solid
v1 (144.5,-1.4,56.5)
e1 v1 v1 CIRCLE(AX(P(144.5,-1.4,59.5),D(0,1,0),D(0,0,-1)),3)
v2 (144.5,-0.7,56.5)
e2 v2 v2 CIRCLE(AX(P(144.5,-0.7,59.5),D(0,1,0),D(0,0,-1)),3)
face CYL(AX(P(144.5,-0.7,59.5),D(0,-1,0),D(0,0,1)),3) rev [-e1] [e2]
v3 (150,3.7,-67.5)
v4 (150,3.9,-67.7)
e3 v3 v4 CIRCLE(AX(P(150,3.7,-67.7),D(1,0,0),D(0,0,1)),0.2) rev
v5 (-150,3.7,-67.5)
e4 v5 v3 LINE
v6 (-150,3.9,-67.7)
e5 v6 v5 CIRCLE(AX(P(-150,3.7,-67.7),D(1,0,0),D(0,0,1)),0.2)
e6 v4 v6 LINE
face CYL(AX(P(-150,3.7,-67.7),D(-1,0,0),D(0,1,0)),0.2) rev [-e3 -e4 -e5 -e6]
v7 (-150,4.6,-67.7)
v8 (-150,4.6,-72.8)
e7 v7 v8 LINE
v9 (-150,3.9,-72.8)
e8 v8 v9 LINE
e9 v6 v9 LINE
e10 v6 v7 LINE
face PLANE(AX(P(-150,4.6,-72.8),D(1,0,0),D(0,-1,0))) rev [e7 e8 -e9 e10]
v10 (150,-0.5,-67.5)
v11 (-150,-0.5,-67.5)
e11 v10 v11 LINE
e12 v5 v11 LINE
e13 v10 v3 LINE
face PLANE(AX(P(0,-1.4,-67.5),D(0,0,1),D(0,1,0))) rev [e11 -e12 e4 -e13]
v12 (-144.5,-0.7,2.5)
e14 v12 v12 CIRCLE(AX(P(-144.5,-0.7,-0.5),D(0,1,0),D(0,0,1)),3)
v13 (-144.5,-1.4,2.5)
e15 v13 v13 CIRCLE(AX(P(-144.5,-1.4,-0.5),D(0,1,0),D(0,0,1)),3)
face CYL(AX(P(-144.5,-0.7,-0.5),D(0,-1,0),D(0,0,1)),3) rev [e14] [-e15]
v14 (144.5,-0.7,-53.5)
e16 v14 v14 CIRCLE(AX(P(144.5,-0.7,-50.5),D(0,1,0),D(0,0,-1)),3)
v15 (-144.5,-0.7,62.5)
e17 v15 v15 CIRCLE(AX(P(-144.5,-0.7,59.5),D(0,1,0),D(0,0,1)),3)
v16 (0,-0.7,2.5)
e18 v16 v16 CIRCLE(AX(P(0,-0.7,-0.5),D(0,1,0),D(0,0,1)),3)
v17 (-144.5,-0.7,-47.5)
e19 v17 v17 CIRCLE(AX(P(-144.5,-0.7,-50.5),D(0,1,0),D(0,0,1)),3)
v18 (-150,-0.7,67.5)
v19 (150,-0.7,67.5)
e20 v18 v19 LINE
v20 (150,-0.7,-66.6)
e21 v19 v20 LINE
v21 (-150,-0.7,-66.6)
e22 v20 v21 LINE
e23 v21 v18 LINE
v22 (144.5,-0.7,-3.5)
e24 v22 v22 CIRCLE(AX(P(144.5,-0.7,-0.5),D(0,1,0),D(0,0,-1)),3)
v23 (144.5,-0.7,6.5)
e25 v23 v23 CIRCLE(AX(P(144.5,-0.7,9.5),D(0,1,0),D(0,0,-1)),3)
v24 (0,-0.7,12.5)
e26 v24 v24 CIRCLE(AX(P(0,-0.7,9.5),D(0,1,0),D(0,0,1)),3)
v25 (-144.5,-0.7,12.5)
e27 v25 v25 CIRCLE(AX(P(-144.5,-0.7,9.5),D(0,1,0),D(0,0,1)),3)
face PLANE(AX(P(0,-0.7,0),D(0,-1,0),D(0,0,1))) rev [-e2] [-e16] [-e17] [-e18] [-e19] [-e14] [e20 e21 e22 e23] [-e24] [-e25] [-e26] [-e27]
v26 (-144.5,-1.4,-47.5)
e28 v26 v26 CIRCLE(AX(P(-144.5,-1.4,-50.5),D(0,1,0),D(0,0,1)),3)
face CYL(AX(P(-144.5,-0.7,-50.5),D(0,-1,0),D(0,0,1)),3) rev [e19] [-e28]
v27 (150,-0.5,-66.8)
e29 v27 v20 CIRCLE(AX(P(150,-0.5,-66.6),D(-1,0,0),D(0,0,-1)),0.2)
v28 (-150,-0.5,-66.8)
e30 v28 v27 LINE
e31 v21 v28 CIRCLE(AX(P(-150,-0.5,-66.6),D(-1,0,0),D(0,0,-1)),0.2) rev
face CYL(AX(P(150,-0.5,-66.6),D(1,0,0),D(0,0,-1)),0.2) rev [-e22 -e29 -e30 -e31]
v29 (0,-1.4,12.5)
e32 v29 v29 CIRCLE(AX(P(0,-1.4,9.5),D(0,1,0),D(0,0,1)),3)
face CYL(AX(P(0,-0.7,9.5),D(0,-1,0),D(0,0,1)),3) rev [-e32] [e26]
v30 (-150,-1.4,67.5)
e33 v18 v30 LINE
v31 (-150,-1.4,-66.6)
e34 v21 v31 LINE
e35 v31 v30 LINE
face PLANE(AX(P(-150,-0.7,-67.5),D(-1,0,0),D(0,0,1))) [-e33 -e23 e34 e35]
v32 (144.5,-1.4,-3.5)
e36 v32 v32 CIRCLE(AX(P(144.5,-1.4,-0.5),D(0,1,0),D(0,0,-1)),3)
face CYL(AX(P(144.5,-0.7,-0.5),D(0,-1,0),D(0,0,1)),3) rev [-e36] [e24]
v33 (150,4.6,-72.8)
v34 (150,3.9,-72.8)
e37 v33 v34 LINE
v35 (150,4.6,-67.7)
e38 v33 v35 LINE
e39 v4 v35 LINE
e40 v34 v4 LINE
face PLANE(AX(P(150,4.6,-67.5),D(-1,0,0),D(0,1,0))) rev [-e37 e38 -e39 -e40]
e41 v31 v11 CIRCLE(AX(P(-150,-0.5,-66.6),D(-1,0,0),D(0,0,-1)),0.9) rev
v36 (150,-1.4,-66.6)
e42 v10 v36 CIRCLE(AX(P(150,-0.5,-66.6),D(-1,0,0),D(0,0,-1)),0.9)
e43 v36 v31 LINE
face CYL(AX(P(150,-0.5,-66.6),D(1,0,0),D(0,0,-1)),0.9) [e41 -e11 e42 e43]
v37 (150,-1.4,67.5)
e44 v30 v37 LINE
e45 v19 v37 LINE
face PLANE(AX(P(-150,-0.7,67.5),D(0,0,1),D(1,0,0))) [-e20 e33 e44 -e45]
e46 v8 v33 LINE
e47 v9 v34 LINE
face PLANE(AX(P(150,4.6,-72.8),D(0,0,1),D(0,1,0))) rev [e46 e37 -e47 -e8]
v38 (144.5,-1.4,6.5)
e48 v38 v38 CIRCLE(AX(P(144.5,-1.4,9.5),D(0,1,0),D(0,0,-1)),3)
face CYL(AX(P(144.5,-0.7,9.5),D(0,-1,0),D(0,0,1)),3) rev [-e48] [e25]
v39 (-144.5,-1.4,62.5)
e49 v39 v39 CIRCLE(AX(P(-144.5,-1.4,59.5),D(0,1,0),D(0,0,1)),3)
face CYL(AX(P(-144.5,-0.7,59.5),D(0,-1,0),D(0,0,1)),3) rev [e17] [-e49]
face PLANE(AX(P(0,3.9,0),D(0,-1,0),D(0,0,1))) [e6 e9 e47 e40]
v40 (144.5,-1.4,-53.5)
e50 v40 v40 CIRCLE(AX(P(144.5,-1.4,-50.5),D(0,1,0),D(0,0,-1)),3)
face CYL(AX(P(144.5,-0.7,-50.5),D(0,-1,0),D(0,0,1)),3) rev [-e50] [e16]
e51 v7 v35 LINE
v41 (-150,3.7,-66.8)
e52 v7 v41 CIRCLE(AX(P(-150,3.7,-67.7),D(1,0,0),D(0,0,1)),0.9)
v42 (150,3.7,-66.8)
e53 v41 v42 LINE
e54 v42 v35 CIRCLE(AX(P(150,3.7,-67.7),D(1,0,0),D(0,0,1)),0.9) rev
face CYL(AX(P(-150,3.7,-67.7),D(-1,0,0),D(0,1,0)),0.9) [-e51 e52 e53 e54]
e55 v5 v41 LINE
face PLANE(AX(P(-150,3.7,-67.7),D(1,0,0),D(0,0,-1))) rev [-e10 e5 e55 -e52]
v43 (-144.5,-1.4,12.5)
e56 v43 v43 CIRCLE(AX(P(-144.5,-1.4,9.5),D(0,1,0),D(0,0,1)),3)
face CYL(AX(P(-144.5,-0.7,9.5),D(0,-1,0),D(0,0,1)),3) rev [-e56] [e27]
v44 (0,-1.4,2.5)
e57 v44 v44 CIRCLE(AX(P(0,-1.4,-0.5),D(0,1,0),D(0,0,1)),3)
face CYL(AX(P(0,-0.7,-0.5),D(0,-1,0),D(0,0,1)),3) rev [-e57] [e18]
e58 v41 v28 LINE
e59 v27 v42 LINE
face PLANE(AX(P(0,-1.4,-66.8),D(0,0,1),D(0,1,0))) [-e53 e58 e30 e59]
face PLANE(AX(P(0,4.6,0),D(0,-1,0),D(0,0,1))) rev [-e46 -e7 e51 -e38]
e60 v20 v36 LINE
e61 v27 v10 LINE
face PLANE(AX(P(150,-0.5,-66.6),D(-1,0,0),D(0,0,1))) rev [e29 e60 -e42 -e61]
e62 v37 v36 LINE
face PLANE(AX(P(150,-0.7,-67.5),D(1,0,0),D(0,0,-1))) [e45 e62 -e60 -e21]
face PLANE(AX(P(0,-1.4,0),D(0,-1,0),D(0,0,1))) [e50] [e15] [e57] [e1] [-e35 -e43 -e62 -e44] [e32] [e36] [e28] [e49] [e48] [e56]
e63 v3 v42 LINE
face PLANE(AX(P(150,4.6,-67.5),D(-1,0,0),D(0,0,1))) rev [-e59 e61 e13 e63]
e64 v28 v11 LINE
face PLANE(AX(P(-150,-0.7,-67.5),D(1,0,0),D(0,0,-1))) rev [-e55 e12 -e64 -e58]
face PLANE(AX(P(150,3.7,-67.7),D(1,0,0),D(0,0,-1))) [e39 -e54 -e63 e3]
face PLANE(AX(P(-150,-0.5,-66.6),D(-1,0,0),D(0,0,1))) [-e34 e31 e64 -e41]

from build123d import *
from build123d.topology import SkipClean

# Parameters (mm, degrees)
SKETCH_1_W                       = 300
SKETCH_1_H                       = 135
SKETCH_1_R                       = 3
SM_BASE_FLANGE_1_DEPTH           = 0.7
SM_EDGE_FLANGE_1_STRIP_W         = 3.2
SM_EDGE_FLANGE_1_STRIP_H         = 0.7
SM_EDGE_FLANGE_1_STRIP_CUT_DEPTH = 300
SM_EDGE_FLANGE_1_DEPTH           = 300
SM_EDGE_FLANGE_2_STRIP_W         = 3.2
SM_EDGE_FLANGE_2_STRIP_H         = 0.7
SM_EDGE_FLANGE_2_STRIP_CUT_DEPTH = 300
SM_EDGE_FLANGE_2_DEPTH           = 300
MOVE_START                       = -0.5
MOVE_BODY_1_OUTLINE_W            = 300
MOVE_BODY_1_OUTLINE_H            = 134.3
MOVE_BODY_1_OUTLINE_R            = 3
MOVE_BODY_1_DEPTH                = 0.5
MOVE_START_2                     = -6
MOVE_BODY_1_2_OUTLINE_W          = 300
MOVE_BODY_1_2_OUTLINE_H          = 6
MOVE_BODY_1_2_DEPTH              = 4.6
MOVE_START_3                     = -1.343604
MOVE_BODY_1_3_OUTLINE_W          = 300
MOVE_BODY_1_3_OUTLINE_H          = 134.3
MOVE_BODY_1_3_OUTLINE_R          = 3
MOVE_BODY_1_3_DEPTH              = 0.643604
MOVE_BODY_1_4_OUTLINE_W          = 300
MOVE_BODY_1_4_OUTLINE_H          = 0.7
MOVE_BODY_1_4_DEPTH              = 4.2
MOVE_START_4                     = -1.4
MOVE_BODY_1_5_OUTLINE_W          = 300
MOVE_BODY_1_5_OUTLINE_H          = 134.3
MOVE_BODY_1_5_OUTLINE_R          = 3
MOVE_BODY_1_5_DEPTH              = 0.056396
MOVE_START_5                     = 3.7
MOVE_BODY_1_6_OUTLINE_W          = 300
MOVE_BODY_1_6_OUTLINE_H          = 6
MOVE_BODY_1_6_DEPTH              = 0.9
MOVE_START_6                     = -0.7
MOVE_BODY_1_7_OUTLINE_W          = 300
MOVE_BODY_1_7_OUTLINE_H          = 0.7
MOVE_BODY_1_7_DEPTH              = 0.2
MOVE_START_7                     = -151
MOVE_BODY_1_8_DEPTH              = 301


with BuildPart() as part:
    # 基体-法兰1: sheet metal written as solids
    # 草图1 → 基体-法兰1 (new body)
    with BuildSketch(Plane(origin=(0, 0, 0), x_dir=(1, 0, 0), z_dir=(0, 1, 0))):
        Rectangle(SKETCH_1_W, SKETCH_1_H)
        with Locations(Location((-144.5, -59.5, 0), (0, 0, 270))):
            Circle(SKETCH_1_R, mode=Mode.SUBTRACT)
        with Locations(Location((-144.5, -9.5, 0), (0, 0, 270))):
            Circle(SKETCH_1_R, mode=Mode.SUBTRACT)
        with Locations(Location((-144.5, 0.5, 0), (0, 0, 270))):
            Circle(SKETCH_1_R, mode=Mode.SUBTRACT)
        with Locations(Location((-144.5, 50.5, 0), (0, 0, 270))):
            Circle(SKETCH_1_R, mode=Mode.SUBTRACT)
        with Locations(Location((0, -9.5, 0), (0, 0, 270))):
            Circle(SKETCH_1_R, mode=Mode.SUBTRACT)
        with Locations(Location((0, 0.5, 0), (0, 0, 270))):
            Circle(SKETCH_1_R, mode=Mode.SUBTRACT)
        with Locations(Location((144.5, -59.5, 0), (0, 0, 90))):
            Circle(SKETCH_1_R, mode=Mode.SUBTRACT)
        with Locations(Location((144.5, -9.5, 0), (0, 0, 90))):
            Circle(SKETCH_1_R, mode=Mode.SUBTRACT)
        with Locations(Location((144.5, 0.5, 0), (0, 0, 90))):
            Circle(SKETCH_1_R, mode=Mode.SUBTRACT)
        with Locations(Location((144.5, 50.5, 0), (0, 0, 90))):
            Circle(SKETCH_1_R, mode=Mode.SUBTRACT)
    extrude(amount=-SM_BASE_FLANGE_1_DEPTH)

    # 边线-法兰1: sheet metal written as solids
    # 边线-法兰1 strip (on a plane across the edge) → 边线-法兰1 strip cut (cut)
    with BuildSketch(Plane(origin=(-150, -0.7, -67.5), x_dir=(0, 0, 1), z_dir=(1, 0, 0))):
        with Locations((-0.7, -0.35)):
            Rectangle(SM_EDGE_FLANGE_1_STRIP_W, SM_EDGE_FLANGE_1_STRIP_H)
    extrude(amount=SM_EDGE_FLANGE_1_STRIP_CUT_DEPTH, mode=Mode.SUBTRACT)

    # 边线-法兰1 section (on a plane across the edge) → 边线-法兰1 (add)
    with BuildSketch(Plane(origin=(-150, -0.7, -67.5), x_dir=(0, 0, 1), z_dir=(1, 0, 0))):
        with BuildLine():
            Line((0, 0.2), (0, 5.3))
            Line((0, 5.3), (0.7, 5.3))
            Line((0.7, 5.3), (0.7, 0.2))
            ThreePointArc((0.7, 0.2), (0.758578644, 0.058578644), (0.9, 0))
            Line((0.9, 0), (0.9, -0.7))
            ThreePointArc((0.9, -0.7), (0.263603897, -0.436396103), (0, 0.2))
        make_face()
    extrude(amount=SM_EDGE_FLANGE_1_DEPTH)

    # 边线-法兰2: sheet metal written as solids
    # 边线-法兰2 strip (on a plane across the edge) → 边线-法兰2 strip cut (cut)
    with BuildSketch(Plane(origin=(150, -6, -67.5), x_dir=(0, 1, 0), z_dir=(-1, 0, 0))):
        with Locations((-0.7, -0.35)):
            Rectangle(SM_EDGE_FLANGE_2_STRIP_W, SM_EDGE_FLANGE_2_STRIP_H)
    extrude(amount=SM_EDGE_FLANGE_2_STRIP_CUT_DEPTH, mode=Mode.SUBTRACT)

    # 边线-法兰2 section (on a plane across the edge) → 边线-法兰2 (add)
    with BuildSketch(Plane(origin=(150, -6, -67.5), x_dir=(0, 1, 0), z_dir=(-1, 0, 0))):
        with BuildLine():
            Line((0, 0.2), (0, 5.3))
            Line((0, 5.3), (0.7, 5.3))
            Line((0.7, 5.3), (0.7, 0.2))
            ThreePointArc((0.7, 0.2), (0.758578644, 0.058578644), (0.9, 0))
            Line((0.9, 0), (0.9, -0.7))
            ThreePointArc((0.9, -0.7), (0.263603897, -0.436396103), (0, 0.2))
        make_face()
    extrude(amount=SM_EDGE_FLANGE_2_DEPTH)

    # Move Body 1: read off the stored shape, not the designer's step
    # Move Body 1 outline → Move Body 1 (cut)
    with BuildSketch(Plane(origin=(0, 0, 0), x_dir=(1, 0, 0), z_dir=(0, 1, 0)).offset(MOVE_START)):
        with Locations((0, -0.35)):
            Rectangle(MOVE_BODY_1_OUTLINE_W, MOVE_BODY_1_OUTLINE_H)
        with Locations((-144.5, -59.5)):
            Circle(MOVE_BODY_1_OUTLINE_R, mode=Mode.SUBTRACT)
        with Locations((-144.5, -9.5)):
            Circle(MOVE_BODY_1_OUTLINE_R, mode=Mode.SUBTRACT)
        with Locations((-144.5, 0.5)):
            Circle(MOVE_BODY_1_OUTLINE_R, mode=Mode.SUBTRACT)
        with Locations((144.5, -59.5)):
            Circle(MOVE_BODY_1_OUTLINE_R, mode=Mode.SUBTRACT)
        with Locations((0, -9.5)):
            Circle(MOVE_BODY_1_OUTLINE_R, mode=Mode.SUBTRACT)
        with Locations((0, 0.5)):
            Circle(MOVE_BODY_1_OUTLINE_R, mode=Mode.SUBTRACT)
        with Locations((144.5, -9.5)):
            Circle(MOVE_BODY_1_OUTLINE_R, mode=Mode.SUBTRACT)
        with Locations((144.5, 0.5)):
            Circle(MOVE_BODY_1_OUTLINE_R, mode=Mode.SUBTRACT)
        with Locations((-144.5, 50.5)):
            Circle(MOVE_BODY_1_OUTLINE_R, mode=Mode.SUBTRACT)
        with Locations((144.5, 50.5)):
            Circle(MOVE_BODY_1_OUTLINE_R, mode=Mode.SUBTRACT)
    extrude(amount=MOVE_BODY_1_DEPTH, mode=Mode.SUBTRACT)

    # Move Body 1 2 outline → Move Body 1 2 (cut)
    with BuildSketch(Plane(origin=(0, 0, 0), x_dir=(1, 0, 0), z_dir=(0, 1, 0)).offset(MOVE_START_2)):
        with Locations((0, 69.8)):
            Rectangle(MOVE_BODY_1_2_OUTLINE_W, MOVE_BODY_1_2_OUTLINE_H)
    extrude(amount=MOVE_BODY_1_2_DEPTH, mode=Mode.SUBTRACT)

    # Move Body 1 3 outline → Move Body 1 3 (add)
    with SkipClean():  # the faces are left unmerged after this step: merging them gives an invalid solid
        with BuildSketch(Plane(origin=(0, 0, 0), x_dir=(1, 0, 0), z_dir=(0, 1, 0)).offset(MOVE_START_3)):
            with Locations((0, -0.35)):
                Rectangle(MOVE_BODY_1_3_OUTLINE_W, MOVE_BODY_1_3_OUTLINE_H)
            with Locations((-144.5, -59.5)):
                Circle(MOVE_BODY_1_3_OUTLINE_R, mode=Mode.SUBTRACT)
            with Locations((-144.5, -9.5)):
                Circle(MOVE_BODY_1_3_OUTLINE_R, mode=Mode.SUBTRACT)
            with Locations((-144.5, 0.5)):
                Circle(MOVE_BODY_1_3_OUTLINE_R, mode=Mode.SUBTRACT)
            with Locations((144.5, -59.5)):
                Circle(MOVE_BODY_1_3_OUTLINE_R, mode=Mode.SUBTRACT)
            with Locations((0, -9.5)):
                Circle(MOVE_BODY_1_3_OUTLINE_R, mode=Mode.SUBTRACT)
            with Locations((0, 0.5)):
                Circle(MOVE_BODY_1_3_OUTLINE_R, mode=Mode.SUBTRACT)
            with Locations((144.5, -9.5)):
                Circle(MOVE_BODY_1_3_OUTLINE_R, mode=Mode.SUBTRACT)
            with Locations((144.5, 0.5)):
                Circle(MOVE_BODY_1_3_OUTLINE_R, mode=Mode.SUBTRACT)
            with Locations((-144.5, 50.5)):
                Circle(MOVE_BODY_1_3_OUTLINE_R, mode=Mode.SUBTRACT)
            with Locations((144.5, 50.5)):
                Circle(MOVE_BODY_1_3_OUTLINE_R, mode=Mode.SUBTRACT)
        extrude(amount=MOVE_BODY_1_3_DEPTH)

    # Move Body 1 4 outline → Move Body 1 4 (add)
    with SkipClean():  # the faces are left unmerged after this step: merging them gives an invalid solid
        with BuildSketch(Plane(origin=(0, 0, 0), x_dir=(1, 0, 0), z_dir=(0, 1, 0)).offset(MOVE_START)):
            with Locations((0, 67.15)):
                Rectangle(MOVE_BODY_1_4_OUTLINE_W, MOVE_BODY_1_4_OUTLINE_H)
        extrude(amount=MOVE_BODY_1_4_DEPTH)

    # Move Body 1 5 outline → Move Body 1 5 (add)
    with SkipClean():  # the faces are left unmerged after this step: merging them gives an invalid solid
        with BuildSketch(Plane(origin=(0, 0, 0), x_dir=(1, 0, 0), z_dir=(0, 1, 0)).offset(MOVE_START_4)):
            with Locations((0, -0.35)):
                Rectangle(MOVE_BODY_1_5_OUTLINE_W, MOVE_BODY_1_5_OUTLINE_H)
            with Locations((-144.5, -59.5)):
                Circle(MOVE_BODY_1_5_OUTLINE_R, mode=Mode.SUBTRACT)
            with Locations((-144.5, -9.5)):
                Circle(MOVE_BODY_1_5_OUTLINE_R, mode=Mode.SUBTRACT)
            with Locations((-144.5, 0.5)):
                Circle(MOVE_BODY_1_5_OUTLINE_R, mode=Mode.SUBTRACT)
            with Locations((144.5, -59.5)):
                Circle(MOVE_BODY_1_5_OUTLINE_R, mode=Mode.SUBTRACT)
            with Locations((0, -9.5)):
                Circle(MOVE_BODY_1_5_OUTLINE_R, mode=Mode.SUBTRACT)
            with Locations((0, 0.5)):
                Circle(MOVE_BODY_1_5_OUTLINE_R, mode=Mode.SUBTRACT)
            with Locations((144.5, -9.5)):
                Circle(MOVE_BODY_1_5_OUTLINE_R, mode=Mode.SUBTRACT)
            with Locations((144.5, 0.5)):
                Circle(MOVE_BODY_1_5_OUTLINE_R, mode=Mode.SUBTRACT)
            with Locations((-144.5, 50.5)):
                Circle(MOVE_BODY_1_5_OUTLINE_R, mode=Mode.SUBTRACT)
            with Locations((144.5, 50.5)):
                Circle(MOVE_BODY_1_5_OUTLINE_R, mode=Mode.SUBTRACT)
        extrude(amount=MOVE_BODY_1_5_DEPTH)

    # Move Body 1 6 outline → Move Body 1 6 (add)
    with SkipClean():  # the faces are left unmerged after this step: merging them gives an invalid solid
        with BuildSketch(Plane(origin=(0, 0, 0), x_dir=(1, 0, 0), z_dir=(0, 1, 0)).offset(MOVE_START_5)):
            with Locations((0, 69.8)):
                Rectangle(MOVE_BODY_1_6_OUTLINE_W, MOVE_BODY_1_6_OUTLINE_H)
        extrude(amount=MOVE_BODY_1_6_DEPTH)

    # Move Body 1 7 outline → Move Body 1 7 (add)
    with SkipClean():  # the faces are left unmerged after this step: merging them gives an invalid solid
        with BuildSketch(Plane(origin=(0, 0, 0), x_dir=(1, 0, 0), z_dir=(0, 1, 0)).offset(MOVE_START_6)):
            with Locations((0, 67.15)):
                Rectangle(MOVE_BODY_1_7_OUTLINE_W, MOVE_BODY_1_7_OUTLINE_H)
        extrude(amount=MOVE_BODY_1_7_DEPTH)

    # Move Body 1 8 outline → Move Body 1 8 (cut)
    with BuildSketch(Plane.YZ.offset(MOVE_START_7)):
        with BuildLine():
            Line((-0.5, 67.5), (-0.7, 67.5))
            Line((-0.7, 67.5), (-0.7, -66.6))
            ThreePointArc((-0.7, -66.6), (-0.641421356, -66.741421356), (-0.5, -66.8))
            Line((-0.5, -66.8), (-0.5, 67.5))
        make_face()
        with BuildLine():
            ThreePointArc((-0.7, -67.477496439), (-1.203562364, -67.161248608), (-1.4, -66.6))
            Line((-1.4, -66.6), (-1.4, -67.5))
            Line((-1.4, -67.5), (-0.9, -67.5))
            ThreePointArc((-0.9, -67.5), (-0.799368978, -67.494356415), (-0.7, -67.477496439))
        make_face()
        with BuildLine():
            Line((4.6, -66.8), (3.7, -66.8))
            ThreePointArc((3.7, -66.8), (4.336396103, -67.063603897), (4.6, -67.7))
            Line((4.6, -67.7), (4.6, -66.8))
        make_face()
        with BuildLine():
            ThreePointArc((-0.5, -67.5), (-0.600631022, -67.494356415), (-0.7, -67.477496439))
            Line((-0.7, -67.477496439), (-0.7, -67.5))
            Line((-0.7, -67.5), (-0.5, -67.5))
        make_face()
        with BuildLine():
            ThreePointArc((3.9, -67.7), (3.841421356, -67.558578644), (3.7, -67.5))
            Line((3.7, -67.5), (3.7, -72.8))
            Line((3.7, -72.8), (3.9, -72.8))
            Line((3.9, -72.8), (3.9, -67.7))
        make_face()
    extrude(amount=MOVE_BODY_1_8_DEPTH, mode=Mode.SUBTRACT)


solid = part.part
